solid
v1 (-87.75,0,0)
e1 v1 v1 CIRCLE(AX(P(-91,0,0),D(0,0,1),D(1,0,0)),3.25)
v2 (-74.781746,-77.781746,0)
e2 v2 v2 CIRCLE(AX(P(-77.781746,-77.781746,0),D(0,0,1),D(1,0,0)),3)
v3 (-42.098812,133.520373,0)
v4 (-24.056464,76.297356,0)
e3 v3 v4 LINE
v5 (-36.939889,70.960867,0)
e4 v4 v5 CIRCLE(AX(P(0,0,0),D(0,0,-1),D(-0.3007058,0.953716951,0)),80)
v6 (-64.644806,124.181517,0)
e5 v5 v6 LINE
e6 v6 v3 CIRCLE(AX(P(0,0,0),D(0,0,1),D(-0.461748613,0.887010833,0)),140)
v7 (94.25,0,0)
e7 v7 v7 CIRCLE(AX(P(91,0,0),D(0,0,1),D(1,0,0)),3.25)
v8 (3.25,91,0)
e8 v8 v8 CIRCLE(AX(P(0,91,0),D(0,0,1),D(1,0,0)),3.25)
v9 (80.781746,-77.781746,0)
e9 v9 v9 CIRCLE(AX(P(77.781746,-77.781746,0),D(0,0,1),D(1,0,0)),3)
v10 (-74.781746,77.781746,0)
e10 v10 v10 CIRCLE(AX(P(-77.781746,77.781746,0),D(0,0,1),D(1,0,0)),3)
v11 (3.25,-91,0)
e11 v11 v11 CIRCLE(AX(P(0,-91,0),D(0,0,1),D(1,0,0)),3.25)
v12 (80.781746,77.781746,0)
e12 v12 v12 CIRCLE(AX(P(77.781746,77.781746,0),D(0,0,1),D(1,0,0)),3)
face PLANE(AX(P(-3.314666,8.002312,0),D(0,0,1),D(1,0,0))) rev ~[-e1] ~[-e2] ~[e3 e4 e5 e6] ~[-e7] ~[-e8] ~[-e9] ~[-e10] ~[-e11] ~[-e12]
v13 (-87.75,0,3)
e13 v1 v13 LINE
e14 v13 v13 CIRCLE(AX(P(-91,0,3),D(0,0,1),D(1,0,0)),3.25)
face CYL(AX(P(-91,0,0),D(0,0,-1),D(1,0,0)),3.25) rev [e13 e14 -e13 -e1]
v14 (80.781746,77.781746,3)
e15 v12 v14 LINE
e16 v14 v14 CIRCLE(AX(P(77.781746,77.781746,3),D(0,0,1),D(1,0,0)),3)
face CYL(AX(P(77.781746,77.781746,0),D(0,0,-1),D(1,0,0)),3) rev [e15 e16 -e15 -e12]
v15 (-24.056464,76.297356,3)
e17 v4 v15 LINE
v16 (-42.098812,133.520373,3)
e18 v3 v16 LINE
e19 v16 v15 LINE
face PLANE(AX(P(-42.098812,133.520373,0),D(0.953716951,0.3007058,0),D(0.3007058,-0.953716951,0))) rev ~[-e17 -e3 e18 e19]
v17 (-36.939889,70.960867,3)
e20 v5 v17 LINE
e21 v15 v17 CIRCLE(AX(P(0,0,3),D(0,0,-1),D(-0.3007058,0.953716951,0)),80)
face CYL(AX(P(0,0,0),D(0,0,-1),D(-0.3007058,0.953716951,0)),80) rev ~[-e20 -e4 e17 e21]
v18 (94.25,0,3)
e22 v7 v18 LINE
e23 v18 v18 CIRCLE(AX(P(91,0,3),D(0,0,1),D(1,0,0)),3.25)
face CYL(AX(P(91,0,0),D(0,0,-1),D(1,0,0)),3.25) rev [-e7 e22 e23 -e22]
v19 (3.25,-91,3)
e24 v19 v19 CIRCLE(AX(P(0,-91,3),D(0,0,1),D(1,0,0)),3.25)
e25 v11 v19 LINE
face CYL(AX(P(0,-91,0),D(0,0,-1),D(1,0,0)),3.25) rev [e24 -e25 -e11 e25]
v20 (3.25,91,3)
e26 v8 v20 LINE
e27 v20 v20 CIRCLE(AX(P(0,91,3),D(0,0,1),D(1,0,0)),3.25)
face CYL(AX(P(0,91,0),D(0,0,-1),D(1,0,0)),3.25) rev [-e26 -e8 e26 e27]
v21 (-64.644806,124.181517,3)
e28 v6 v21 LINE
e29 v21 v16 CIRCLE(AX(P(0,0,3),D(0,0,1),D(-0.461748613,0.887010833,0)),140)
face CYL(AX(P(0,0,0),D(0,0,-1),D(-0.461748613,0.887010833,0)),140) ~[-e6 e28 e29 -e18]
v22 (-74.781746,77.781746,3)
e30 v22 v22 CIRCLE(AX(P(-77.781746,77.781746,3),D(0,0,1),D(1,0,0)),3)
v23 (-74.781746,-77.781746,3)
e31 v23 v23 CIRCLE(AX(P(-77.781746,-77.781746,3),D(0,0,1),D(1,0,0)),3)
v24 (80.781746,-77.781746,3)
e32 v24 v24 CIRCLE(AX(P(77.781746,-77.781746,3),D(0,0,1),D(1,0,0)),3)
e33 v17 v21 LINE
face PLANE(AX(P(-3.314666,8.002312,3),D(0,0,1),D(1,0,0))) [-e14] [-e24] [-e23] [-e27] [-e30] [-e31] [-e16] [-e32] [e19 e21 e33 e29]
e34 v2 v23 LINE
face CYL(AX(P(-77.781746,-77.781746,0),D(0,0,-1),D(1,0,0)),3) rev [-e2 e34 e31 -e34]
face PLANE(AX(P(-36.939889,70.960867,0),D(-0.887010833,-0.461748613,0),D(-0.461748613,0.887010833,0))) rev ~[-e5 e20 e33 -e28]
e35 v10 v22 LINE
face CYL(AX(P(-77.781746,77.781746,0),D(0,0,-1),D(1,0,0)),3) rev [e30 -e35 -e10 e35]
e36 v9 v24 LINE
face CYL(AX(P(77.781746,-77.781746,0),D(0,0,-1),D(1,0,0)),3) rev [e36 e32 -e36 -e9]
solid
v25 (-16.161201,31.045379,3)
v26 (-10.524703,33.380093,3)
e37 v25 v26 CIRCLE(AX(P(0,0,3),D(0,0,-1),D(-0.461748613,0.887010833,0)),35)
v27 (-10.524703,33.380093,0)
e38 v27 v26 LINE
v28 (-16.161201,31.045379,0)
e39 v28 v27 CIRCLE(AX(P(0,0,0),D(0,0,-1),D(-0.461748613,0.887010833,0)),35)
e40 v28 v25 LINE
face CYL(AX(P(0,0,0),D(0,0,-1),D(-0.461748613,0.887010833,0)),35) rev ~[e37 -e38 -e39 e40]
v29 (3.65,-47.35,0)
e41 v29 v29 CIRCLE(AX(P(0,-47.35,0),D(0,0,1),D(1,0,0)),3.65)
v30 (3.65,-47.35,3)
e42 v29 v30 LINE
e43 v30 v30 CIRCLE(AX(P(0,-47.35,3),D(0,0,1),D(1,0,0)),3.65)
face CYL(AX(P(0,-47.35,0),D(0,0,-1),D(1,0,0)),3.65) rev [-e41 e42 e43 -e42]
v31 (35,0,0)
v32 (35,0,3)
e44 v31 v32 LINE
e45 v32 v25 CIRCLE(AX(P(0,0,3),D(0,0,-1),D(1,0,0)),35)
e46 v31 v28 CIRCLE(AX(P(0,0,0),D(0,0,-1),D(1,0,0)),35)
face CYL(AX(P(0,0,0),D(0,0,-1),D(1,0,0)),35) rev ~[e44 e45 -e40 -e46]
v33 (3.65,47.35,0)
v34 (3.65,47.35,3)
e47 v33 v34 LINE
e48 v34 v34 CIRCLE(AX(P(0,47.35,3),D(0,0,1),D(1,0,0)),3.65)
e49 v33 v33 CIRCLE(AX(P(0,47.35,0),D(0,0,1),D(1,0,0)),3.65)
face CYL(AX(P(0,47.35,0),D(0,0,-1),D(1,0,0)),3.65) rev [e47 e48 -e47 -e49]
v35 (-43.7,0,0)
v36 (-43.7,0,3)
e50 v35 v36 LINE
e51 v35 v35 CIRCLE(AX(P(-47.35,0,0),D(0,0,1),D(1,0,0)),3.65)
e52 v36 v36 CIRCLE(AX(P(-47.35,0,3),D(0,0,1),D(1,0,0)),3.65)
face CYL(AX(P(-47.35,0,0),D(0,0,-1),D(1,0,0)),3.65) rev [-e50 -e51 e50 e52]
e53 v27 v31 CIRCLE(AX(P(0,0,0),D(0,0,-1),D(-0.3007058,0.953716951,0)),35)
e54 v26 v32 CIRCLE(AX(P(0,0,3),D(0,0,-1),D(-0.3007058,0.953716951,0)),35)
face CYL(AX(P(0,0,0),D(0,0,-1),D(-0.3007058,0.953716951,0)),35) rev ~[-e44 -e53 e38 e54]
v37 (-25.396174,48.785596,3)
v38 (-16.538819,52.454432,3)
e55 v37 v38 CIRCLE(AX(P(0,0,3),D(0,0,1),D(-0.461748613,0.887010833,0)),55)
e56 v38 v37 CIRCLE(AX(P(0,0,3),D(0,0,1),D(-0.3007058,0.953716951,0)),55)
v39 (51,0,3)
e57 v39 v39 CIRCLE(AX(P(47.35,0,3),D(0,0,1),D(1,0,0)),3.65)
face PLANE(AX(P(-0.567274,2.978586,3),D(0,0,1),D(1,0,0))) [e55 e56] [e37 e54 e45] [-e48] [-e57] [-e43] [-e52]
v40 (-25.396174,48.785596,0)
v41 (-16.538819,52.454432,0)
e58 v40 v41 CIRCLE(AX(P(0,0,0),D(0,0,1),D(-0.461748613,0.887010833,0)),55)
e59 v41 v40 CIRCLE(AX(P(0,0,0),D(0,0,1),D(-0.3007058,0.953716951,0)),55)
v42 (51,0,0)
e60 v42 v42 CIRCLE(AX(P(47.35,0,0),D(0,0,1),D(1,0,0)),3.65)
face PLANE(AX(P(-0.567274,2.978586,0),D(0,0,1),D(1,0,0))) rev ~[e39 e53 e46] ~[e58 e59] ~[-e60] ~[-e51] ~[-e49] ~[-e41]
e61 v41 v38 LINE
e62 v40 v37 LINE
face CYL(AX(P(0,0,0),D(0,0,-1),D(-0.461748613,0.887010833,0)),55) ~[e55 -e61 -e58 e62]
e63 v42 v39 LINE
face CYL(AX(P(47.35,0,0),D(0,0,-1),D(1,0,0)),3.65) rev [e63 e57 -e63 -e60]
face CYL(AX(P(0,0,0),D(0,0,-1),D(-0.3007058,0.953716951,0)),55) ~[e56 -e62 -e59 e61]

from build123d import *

# Parameters (mm, degrees)
F0_R     = 3
F0_R_2   = 3.25
F1_DEPTH = 3
F0_R_3   = 3.65
F2_DEPTH = 3


# Not quite as in the source:
# - a feature names something its author has since deleted; it is built from what else it names


with BuildPart() as f1:
    # F0 (on Top) → F1 (new body)
    with BuildSketch(Plane.XY):
        with BuildLine():
            ThreePointArc((-24.0564639603, 76.2973560599), (47.3047718691, 64.5155683414), (80, 0))
            ThreePointArc((80, 0), (-41.5018606528, -68.3929496538), (-36.9398890588, 70.9608666543))
            Line((-36.9398890588, 70.9608666543), (-64.6448058529, 124.181516645))
            ThreePointArc((-64.6448058529, 124.181516645), (-72.6282561425, -119.6876618942), (140, 0))
            ThreePointArc((140, 0), (82.7833507709, 112.9022445974), (-42.0988119306, 133.5203731048))
            Line((-42.0988119306, 133.5203731048), (-24.0564639603, 76.2973560599))
        make_face()
        with Locations((-77.7817459305, -77.7817459305)):
            Circle(F0_R, mode=Mode.SUBTRACT)
        with Locations((0, -91)):
            Circle(F0_R_2, mode=Mode.SUBTRACT)
        with Locations((77.7817459305, -77.7817459305)):
            Circle(F0_R, mode=Mode.SUBTRACT)
        with Locations((-91, 0)):
            Circle(F0_R_2, mode=Mode.SUBTRACT)
        with Locations((-77.7817459305, 77.7817459305)):
            Circle(F0_R, mode=Mode.SUBTRACT)
        with Locations((91, 0)):
            Circle(F0_R_2, mode=Mode.SUBTRACT)
        with Locations((0, 91)):
            Circle(F0_R_2, mode=Mode.SUBTRACT)
        with Locations((77.7817459305, 77.7817459305)):
            Circle(F0_R, mode=Mode.SUBTRACT)
    extrude(amount=F1_DEPTH)


with BuildPart() as f2:
    # F0 (on Top) → F2 (new body)
    with BuildSketch(Plane.XY):
        with BuildLine():
            ThreePointArc((55, 0), (32.52203066, 44.3544532347), (-16.5388189727, 52.4544322912))
            Line((-16.5388189727, 52.4544322912), (-10.5247029826, 33.3800932762))
            ThreePointArc((-10.5247029827, 33.3800932762), (20.6958376927, 28.2255611494), (35, 0))
            ThreePointArc((35, 0), (-18.1570640356, -29.9219154736), (-16.1612014632, 31.0453791612))
            Line((-16.1612014632, 31.0453791612), (-25.3961737279, 48.7855958248))
            ThreePointArc((-25.3961737279, 48.7855958248), (-28.5325291988, -47.020152887), (55, 0))
        make_face()
        with Locations((0, -47.35)):
            Circle(F0_R_3, mode=Mode.SUBTRACT)
        with Locations((-47.35, 0)):
            Circle(F0_R_3, mode=Mode.SUBTRACT)
        with Locations((47.35, 0)):
            Circle(F0_R_3, mode=Mode.SUBTRACT)
        with Locations((0, 47.35)):
            Circle(F0_R_3, mode=Mode.SUBTRACT)
        with BuildLine():
            Line((-10.5247029826, 33.3800932762), (-16.5388189727, 52.4544322912))
            ThreePointArc((-16.5388189727, 52.4544322912), (-21.0475887801, 50.8133742881), (-25.3961737279, 48.7855958248))
            Line((-25.3961737279, 48.7855958248), (-16.1612014632, 31.0453791612))
            ThreePointArc((-16.1612014632, 31.0453791612), (-13.3939201328, 32.3357836379), (-10.5247029827, 33.3800932762))
        make_face()
    extrude(amount=F2_DEPTH)


solid = Compound([f1.part, f2.part])
